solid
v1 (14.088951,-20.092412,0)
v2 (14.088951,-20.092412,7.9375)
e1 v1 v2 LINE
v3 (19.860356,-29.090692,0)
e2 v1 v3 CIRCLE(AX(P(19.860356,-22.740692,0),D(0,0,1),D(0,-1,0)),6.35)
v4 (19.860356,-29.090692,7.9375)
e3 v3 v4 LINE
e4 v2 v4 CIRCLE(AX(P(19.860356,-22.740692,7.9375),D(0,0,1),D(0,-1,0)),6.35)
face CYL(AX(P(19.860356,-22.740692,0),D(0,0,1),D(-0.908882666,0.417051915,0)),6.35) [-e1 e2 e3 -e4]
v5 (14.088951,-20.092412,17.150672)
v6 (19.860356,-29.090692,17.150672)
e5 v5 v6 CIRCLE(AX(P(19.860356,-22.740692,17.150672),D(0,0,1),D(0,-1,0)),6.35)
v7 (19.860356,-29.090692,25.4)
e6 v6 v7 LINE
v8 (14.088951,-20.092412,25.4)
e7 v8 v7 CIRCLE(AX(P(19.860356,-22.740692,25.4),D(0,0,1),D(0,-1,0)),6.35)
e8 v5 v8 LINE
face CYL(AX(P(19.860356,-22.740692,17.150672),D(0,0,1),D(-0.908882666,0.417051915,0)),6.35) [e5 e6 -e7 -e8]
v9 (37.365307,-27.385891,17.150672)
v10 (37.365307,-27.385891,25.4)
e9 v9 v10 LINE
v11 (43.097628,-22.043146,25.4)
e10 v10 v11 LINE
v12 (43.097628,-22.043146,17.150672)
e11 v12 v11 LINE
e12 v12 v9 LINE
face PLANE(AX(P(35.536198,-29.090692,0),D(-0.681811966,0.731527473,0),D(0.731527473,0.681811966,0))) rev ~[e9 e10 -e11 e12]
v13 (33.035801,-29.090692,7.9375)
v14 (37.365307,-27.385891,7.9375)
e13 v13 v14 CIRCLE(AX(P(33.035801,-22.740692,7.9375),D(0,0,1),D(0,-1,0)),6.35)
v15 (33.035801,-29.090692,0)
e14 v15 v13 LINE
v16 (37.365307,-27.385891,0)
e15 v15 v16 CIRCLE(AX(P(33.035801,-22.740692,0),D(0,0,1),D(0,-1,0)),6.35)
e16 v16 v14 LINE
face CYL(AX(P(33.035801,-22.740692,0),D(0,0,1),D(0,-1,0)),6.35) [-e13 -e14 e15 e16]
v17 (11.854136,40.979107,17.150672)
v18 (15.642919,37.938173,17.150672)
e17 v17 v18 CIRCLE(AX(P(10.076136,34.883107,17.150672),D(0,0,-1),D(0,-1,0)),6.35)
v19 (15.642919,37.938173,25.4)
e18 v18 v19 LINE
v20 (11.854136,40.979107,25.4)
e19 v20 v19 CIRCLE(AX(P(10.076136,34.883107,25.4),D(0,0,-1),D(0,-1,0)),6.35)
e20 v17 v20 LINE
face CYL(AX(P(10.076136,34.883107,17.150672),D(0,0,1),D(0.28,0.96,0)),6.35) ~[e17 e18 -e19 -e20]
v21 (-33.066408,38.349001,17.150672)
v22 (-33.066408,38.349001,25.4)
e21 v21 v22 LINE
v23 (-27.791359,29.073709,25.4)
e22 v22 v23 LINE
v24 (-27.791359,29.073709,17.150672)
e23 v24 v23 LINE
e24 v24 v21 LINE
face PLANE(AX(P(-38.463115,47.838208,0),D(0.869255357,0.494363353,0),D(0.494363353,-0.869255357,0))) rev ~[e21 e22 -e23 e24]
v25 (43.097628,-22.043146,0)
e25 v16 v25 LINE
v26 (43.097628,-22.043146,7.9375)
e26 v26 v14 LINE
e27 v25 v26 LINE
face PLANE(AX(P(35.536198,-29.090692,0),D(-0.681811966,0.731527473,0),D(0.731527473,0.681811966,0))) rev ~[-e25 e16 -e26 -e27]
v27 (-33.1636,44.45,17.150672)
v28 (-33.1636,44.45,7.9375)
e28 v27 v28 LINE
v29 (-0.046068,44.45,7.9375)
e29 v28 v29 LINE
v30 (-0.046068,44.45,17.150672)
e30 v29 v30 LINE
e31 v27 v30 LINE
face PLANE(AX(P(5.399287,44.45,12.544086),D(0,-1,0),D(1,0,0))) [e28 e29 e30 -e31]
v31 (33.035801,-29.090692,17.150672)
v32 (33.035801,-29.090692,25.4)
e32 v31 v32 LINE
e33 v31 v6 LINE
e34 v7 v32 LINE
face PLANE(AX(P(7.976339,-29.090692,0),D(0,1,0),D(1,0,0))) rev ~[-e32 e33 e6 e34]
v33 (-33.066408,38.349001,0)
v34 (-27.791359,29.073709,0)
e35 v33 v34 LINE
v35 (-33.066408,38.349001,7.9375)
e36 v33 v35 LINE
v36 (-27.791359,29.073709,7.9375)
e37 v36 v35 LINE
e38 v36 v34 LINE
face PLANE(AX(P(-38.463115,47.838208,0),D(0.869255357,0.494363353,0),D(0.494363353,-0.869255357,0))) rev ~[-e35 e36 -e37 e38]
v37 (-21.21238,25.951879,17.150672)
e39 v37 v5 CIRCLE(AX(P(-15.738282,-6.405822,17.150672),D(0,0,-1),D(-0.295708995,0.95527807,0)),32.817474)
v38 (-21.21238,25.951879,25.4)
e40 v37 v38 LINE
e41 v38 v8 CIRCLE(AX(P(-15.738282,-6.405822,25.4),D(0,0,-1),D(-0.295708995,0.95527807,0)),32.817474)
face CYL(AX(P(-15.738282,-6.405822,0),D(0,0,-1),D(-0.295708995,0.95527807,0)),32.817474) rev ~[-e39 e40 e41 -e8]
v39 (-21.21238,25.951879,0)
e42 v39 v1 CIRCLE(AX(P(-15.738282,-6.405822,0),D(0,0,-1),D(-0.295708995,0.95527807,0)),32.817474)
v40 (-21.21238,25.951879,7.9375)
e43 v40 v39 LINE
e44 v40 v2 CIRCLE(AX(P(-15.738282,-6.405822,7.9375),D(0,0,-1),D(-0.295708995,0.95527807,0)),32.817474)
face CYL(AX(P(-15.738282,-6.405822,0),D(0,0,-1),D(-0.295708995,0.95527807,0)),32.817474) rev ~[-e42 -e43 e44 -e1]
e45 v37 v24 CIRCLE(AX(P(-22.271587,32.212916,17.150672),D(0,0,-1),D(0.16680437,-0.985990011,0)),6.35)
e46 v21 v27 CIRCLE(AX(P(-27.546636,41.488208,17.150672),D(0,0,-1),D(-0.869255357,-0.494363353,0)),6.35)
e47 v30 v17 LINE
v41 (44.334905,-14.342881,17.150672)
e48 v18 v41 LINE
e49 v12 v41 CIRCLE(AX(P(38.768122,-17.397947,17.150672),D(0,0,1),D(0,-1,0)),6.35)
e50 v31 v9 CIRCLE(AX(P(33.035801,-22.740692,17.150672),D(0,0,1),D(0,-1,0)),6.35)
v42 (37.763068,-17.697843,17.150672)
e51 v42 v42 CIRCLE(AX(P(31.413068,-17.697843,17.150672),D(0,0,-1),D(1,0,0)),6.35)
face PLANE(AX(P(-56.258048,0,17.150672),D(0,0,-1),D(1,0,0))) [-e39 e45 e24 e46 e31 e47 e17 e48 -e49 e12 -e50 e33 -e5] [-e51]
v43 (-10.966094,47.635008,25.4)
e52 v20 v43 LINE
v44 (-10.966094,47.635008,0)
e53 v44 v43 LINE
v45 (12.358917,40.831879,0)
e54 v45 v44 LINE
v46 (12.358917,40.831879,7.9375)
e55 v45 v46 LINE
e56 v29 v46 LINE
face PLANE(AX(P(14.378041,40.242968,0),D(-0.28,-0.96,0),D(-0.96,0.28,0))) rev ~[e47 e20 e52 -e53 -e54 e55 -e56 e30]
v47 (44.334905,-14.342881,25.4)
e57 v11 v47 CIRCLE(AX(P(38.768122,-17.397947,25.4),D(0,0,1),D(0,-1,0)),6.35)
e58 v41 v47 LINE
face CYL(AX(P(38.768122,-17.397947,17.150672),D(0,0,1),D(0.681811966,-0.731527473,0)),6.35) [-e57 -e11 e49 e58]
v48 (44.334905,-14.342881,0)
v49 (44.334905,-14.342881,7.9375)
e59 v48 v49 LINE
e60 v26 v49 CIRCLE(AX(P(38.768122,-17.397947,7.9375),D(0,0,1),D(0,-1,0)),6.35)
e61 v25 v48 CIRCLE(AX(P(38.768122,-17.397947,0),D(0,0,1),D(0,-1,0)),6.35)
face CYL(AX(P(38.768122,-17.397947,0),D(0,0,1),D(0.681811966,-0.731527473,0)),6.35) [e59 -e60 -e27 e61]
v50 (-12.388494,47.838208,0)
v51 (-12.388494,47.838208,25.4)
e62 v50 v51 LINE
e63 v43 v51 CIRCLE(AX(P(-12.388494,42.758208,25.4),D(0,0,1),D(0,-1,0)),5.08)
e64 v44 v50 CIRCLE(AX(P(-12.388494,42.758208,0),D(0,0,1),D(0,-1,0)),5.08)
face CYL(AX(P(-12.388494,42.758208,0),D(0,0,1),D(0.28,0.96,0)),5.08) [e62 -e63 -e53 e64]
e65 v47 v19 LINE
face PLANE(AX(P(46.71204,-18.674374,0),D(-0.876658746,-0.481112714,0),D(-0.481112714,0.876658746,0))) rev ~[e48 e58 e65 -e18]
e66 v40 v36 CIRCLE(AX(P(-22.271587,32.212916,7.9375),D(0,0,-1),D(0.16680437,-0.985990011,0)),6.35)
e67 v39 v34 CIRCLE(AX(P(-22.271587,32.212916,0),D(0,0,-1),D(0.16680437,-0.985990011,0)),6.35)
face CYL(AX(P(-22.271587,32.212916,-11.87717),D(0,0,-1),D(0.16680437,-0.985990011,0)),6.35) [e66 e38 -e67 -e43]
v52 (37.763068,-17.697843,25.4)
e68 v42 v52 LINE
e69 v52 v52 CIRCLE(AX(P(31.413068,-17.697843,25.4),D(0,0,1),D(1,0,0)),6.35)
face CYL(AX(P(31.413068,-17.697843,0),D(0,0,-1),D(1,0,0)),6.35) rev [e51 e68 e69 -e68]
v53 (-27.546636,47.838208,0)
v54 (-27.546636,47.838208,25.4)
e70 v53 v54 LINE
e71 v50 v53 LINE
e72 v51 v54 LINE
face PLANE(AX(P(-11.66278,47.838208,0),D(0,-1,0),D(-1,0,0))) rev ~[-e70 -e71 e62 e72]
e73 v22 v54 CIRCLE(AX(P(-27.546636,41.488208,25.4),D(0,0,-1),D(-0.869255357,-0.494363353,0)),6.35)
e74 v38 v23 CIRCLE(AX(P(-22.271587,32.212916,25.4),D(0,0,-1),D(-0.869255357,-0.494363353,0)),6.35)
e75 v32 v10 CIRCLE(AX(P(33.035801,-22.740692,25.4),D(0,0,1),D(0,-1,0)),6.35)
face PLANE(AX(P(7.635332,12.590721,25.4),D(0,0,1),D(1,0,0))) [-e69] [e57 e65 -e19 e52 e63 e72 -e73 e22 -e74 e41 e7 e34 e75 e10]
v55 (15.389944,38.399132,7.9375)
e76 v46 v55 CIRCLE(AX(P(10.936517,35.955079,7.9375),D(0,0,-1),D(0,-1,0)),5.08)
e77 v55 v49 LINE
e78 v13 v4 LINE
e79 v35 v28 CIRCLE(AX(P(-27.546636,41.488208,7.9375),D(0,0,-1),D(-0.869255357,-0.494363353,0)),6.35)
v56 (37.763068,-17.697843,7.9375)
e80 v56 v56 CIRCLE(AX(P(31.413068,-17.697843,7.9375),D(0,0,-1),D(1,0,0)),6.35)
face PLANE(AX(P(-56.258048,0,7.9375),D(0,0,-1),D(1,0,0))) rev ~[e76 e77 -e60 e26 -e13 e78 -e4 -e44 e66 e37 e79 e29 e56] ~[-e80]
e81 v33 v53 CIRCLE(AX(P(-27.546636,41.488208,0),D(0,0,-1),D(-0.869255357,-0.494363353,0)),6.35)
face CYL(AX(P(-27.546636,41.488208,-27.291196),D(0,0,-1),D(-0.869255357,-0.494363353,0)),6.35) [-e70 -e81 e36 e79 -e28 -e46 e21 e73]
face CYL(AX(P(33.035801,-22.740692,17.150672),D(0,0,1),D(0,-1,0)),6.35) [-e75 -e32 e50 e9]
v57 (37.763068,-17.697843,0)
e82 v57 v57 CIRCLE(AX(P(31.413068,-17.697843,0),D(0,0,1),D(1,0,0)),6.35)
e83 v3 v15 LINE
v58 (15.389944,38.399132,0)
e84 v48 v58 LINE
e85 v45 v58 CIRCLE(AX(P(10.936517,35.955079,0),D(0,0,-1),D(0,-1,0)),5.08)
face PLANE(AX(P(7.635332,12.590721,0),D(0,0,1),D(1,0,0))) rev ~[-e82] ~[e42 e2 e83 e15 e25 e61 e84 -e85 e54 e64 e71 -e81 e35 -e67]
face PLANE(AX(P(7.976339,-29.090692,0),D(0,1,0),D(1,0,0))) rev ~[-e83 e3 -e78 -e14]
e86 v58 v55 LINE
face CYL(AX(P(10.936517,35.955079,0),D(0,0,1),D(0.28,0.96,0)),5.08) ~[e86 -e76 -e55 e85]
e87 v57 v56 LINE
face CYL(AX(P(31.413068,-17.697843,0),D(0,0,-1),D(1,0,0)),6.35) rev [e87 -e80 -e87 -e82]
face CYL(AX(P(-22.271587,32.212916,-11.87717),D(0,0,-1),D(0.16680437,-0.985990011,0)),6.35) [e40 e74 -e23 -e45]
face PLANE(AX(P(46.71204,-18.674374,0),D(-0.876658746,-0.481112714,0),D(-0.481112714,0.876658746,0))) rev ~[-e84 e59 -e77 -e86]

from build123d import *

# Parameters (mm, degrees)
F0_R        = 6.35
F1_DEPTH    = 25.4
F2_W        = 123.3146692741
F2_H        = 9.2131719061
F3_DEPTH    = 44.45
F4_R        = 6.35
F5_R        = 5.08
F6_R        = 5.08
F7_R        = 6.35
F8_R        = 6.35
F9_T1_DEPTH = 31.6918409034
F9_T3_DEPTH = 32.0036689973
F9_T5_DEPTH = 79.9823917725


# Not quite as in the source:
# - a fillet or chamfer that OpenCascade refuses, or shapes differently, is made with other operations: its cross-section is extruded or revolved along the edge and cut away or added


with BuildPart() as f1:
    # F0 (on Top) → F1 (new body)
    with BuildSketch(Plane.XY):
        with BuildLine():
            Line((-38.4631145681, 47.8382077998), (-25.4427038645, 24.9439910361))
            ThreePointArc((-25.4427038645, 24.9439910361), (12.1724359017, 10.8562296523), (7.9763394945, -29.0906918233))
            Line((7.9763394945, -29.0906918233), (35.5361980368, -29.0906918233))
            Line((35.5361980368, -29.0906918233), (46.7120397772, -18.6743740407))
            Line((46.7120397772, -18.6743740407), (14.3780414237, 40.2429682227))
            Line((14.3780414237, 40.2429682227), (-11.6627799835, 47.8382077998))
            Line((-11.6627799835, 47.8382077998), (-38.4631145681, 47.8382077998))
        make_face()
        with Locations((31.4130679807, -17.697843238)):
            Circle(F0_R, mode=Mode.SUBTRACT)
    extrude(amount=F1_DEPTH)

    # F2 (on Front) → F3 (cut, symmetric)
    with BuildSketch(Plane.XZ):
        with Locations((5.399286747, 12.5440859531)):
            Rectangle(F2_W, F2_H)
    extrude(amount=F3_DEPTH, both=True, mode=Mode.SUBTRACT)

    # F4
    f4_edges = [f1.edges().sort_by_distance(p)[0] for p in [
        (14.378041, 40.242968, 21.275336),
    ]]
    fillet(f4_edges, radius=F4_R)

    # F5
    f5_edges = [f1.edges().sort_by_distance(p)[0] for p in [
        (14.378041, 40.242968, 3.96875),
    ]]
    fillet(f5_edges, radius=F5_R)

    # F6
    f6_edges = [f1.edges().sort_by_distance(p)[0] for p in [
        (-11.66278, 47.838208, 12.7),
    ]]
    fillet(f6_edges, radius=F6_R)

    # F7
    f7_edges = [f1.edges().sort_by_distance(p)[0] for p in [
        (7.976339, -29.090692, 21.275336),
        (7.976339, -29.090692, 3.96875),
    ]]
    fillet(f7_edges, radius=F7_R)

    # F8
    f8_edges = [f1.edges().sort_by_distance(p)[0] for p in [
        (35.536198, -29.090692, 3.96875),
        (35.536198, -29.090692, 21.275336),
        (46.71204, -18.674374, 21.275336),
        (46.71204, -18.674374, 3.96875),
    ]]
    fillet(f8_edges, radius=F8_R)

    # F9: fillet of radius 6.35 on 3 edges, made by hand

    # F9_s2 → F9_t1 (cut)
    with BuildSketch(Plane.XY.offset(-11.8771704517)):
        with BuildLine():
            ThreePointArc((-21.2123797216, 25.95187937), (-24.9938313602, 26.4760275688), (-27.791358986, 29.0737086524))
            Line((-27.791358986, 29.0737086524), (-25.4427038645, 24.9439910361))
            ThreePointArc((-25.4427038645, 24.9439910361), (-23.3442549108, 25.5180837534), (-21.2123797216, 25.95187937))
        make_face()
    extrude(amount=F9_T1_DEPTH, mode=Mode.SUBTRACT)

    # F9_s4 → F9_t3 (cut)
    with BuildSketch(Plane.XY.offset(5.2735014544)):
        with BuildLine():
            ThreePointArc((-27.791358986, 29.0737086524), (-24.9938313602, 26.4760275688), (-21.2123797216, 25.95187937))
            ThreePointArc((-21.2123797216, 25.95187937), (-23.3442549108, 25.5180837534), (-25.4427038645, 24.9439910361))
            Line((-25.4427038645, 24.9439910361), (-27.791358986, 29.0737086524))
        make_face()
    extrude(amount=F9_T3_DEPTH, mode=Mode.SUBTRACT)

    # F9_s6 → F9_t5 (cut)
    with BuildSketch(Plane.XY.offset(-27.2911958862)):
        with BuildLine():
            ThreePointArc((-33.0664077304, 38.3490005109), (-33.0355553369, 44.6810539999), (-27.5466362136, 47.8382077998))
            Line((-27.5466362136, 47.8382077998), (-38.4631145681, 47.8382077998))
            Line((-38.4631145681, 47.8382077998), (-33.0664077304, 38.3490005109))
        make_face()
    extrude(amount=F9_T5_DEPTH, mode=Mode.SUBTRACT)


solid = f1.part
